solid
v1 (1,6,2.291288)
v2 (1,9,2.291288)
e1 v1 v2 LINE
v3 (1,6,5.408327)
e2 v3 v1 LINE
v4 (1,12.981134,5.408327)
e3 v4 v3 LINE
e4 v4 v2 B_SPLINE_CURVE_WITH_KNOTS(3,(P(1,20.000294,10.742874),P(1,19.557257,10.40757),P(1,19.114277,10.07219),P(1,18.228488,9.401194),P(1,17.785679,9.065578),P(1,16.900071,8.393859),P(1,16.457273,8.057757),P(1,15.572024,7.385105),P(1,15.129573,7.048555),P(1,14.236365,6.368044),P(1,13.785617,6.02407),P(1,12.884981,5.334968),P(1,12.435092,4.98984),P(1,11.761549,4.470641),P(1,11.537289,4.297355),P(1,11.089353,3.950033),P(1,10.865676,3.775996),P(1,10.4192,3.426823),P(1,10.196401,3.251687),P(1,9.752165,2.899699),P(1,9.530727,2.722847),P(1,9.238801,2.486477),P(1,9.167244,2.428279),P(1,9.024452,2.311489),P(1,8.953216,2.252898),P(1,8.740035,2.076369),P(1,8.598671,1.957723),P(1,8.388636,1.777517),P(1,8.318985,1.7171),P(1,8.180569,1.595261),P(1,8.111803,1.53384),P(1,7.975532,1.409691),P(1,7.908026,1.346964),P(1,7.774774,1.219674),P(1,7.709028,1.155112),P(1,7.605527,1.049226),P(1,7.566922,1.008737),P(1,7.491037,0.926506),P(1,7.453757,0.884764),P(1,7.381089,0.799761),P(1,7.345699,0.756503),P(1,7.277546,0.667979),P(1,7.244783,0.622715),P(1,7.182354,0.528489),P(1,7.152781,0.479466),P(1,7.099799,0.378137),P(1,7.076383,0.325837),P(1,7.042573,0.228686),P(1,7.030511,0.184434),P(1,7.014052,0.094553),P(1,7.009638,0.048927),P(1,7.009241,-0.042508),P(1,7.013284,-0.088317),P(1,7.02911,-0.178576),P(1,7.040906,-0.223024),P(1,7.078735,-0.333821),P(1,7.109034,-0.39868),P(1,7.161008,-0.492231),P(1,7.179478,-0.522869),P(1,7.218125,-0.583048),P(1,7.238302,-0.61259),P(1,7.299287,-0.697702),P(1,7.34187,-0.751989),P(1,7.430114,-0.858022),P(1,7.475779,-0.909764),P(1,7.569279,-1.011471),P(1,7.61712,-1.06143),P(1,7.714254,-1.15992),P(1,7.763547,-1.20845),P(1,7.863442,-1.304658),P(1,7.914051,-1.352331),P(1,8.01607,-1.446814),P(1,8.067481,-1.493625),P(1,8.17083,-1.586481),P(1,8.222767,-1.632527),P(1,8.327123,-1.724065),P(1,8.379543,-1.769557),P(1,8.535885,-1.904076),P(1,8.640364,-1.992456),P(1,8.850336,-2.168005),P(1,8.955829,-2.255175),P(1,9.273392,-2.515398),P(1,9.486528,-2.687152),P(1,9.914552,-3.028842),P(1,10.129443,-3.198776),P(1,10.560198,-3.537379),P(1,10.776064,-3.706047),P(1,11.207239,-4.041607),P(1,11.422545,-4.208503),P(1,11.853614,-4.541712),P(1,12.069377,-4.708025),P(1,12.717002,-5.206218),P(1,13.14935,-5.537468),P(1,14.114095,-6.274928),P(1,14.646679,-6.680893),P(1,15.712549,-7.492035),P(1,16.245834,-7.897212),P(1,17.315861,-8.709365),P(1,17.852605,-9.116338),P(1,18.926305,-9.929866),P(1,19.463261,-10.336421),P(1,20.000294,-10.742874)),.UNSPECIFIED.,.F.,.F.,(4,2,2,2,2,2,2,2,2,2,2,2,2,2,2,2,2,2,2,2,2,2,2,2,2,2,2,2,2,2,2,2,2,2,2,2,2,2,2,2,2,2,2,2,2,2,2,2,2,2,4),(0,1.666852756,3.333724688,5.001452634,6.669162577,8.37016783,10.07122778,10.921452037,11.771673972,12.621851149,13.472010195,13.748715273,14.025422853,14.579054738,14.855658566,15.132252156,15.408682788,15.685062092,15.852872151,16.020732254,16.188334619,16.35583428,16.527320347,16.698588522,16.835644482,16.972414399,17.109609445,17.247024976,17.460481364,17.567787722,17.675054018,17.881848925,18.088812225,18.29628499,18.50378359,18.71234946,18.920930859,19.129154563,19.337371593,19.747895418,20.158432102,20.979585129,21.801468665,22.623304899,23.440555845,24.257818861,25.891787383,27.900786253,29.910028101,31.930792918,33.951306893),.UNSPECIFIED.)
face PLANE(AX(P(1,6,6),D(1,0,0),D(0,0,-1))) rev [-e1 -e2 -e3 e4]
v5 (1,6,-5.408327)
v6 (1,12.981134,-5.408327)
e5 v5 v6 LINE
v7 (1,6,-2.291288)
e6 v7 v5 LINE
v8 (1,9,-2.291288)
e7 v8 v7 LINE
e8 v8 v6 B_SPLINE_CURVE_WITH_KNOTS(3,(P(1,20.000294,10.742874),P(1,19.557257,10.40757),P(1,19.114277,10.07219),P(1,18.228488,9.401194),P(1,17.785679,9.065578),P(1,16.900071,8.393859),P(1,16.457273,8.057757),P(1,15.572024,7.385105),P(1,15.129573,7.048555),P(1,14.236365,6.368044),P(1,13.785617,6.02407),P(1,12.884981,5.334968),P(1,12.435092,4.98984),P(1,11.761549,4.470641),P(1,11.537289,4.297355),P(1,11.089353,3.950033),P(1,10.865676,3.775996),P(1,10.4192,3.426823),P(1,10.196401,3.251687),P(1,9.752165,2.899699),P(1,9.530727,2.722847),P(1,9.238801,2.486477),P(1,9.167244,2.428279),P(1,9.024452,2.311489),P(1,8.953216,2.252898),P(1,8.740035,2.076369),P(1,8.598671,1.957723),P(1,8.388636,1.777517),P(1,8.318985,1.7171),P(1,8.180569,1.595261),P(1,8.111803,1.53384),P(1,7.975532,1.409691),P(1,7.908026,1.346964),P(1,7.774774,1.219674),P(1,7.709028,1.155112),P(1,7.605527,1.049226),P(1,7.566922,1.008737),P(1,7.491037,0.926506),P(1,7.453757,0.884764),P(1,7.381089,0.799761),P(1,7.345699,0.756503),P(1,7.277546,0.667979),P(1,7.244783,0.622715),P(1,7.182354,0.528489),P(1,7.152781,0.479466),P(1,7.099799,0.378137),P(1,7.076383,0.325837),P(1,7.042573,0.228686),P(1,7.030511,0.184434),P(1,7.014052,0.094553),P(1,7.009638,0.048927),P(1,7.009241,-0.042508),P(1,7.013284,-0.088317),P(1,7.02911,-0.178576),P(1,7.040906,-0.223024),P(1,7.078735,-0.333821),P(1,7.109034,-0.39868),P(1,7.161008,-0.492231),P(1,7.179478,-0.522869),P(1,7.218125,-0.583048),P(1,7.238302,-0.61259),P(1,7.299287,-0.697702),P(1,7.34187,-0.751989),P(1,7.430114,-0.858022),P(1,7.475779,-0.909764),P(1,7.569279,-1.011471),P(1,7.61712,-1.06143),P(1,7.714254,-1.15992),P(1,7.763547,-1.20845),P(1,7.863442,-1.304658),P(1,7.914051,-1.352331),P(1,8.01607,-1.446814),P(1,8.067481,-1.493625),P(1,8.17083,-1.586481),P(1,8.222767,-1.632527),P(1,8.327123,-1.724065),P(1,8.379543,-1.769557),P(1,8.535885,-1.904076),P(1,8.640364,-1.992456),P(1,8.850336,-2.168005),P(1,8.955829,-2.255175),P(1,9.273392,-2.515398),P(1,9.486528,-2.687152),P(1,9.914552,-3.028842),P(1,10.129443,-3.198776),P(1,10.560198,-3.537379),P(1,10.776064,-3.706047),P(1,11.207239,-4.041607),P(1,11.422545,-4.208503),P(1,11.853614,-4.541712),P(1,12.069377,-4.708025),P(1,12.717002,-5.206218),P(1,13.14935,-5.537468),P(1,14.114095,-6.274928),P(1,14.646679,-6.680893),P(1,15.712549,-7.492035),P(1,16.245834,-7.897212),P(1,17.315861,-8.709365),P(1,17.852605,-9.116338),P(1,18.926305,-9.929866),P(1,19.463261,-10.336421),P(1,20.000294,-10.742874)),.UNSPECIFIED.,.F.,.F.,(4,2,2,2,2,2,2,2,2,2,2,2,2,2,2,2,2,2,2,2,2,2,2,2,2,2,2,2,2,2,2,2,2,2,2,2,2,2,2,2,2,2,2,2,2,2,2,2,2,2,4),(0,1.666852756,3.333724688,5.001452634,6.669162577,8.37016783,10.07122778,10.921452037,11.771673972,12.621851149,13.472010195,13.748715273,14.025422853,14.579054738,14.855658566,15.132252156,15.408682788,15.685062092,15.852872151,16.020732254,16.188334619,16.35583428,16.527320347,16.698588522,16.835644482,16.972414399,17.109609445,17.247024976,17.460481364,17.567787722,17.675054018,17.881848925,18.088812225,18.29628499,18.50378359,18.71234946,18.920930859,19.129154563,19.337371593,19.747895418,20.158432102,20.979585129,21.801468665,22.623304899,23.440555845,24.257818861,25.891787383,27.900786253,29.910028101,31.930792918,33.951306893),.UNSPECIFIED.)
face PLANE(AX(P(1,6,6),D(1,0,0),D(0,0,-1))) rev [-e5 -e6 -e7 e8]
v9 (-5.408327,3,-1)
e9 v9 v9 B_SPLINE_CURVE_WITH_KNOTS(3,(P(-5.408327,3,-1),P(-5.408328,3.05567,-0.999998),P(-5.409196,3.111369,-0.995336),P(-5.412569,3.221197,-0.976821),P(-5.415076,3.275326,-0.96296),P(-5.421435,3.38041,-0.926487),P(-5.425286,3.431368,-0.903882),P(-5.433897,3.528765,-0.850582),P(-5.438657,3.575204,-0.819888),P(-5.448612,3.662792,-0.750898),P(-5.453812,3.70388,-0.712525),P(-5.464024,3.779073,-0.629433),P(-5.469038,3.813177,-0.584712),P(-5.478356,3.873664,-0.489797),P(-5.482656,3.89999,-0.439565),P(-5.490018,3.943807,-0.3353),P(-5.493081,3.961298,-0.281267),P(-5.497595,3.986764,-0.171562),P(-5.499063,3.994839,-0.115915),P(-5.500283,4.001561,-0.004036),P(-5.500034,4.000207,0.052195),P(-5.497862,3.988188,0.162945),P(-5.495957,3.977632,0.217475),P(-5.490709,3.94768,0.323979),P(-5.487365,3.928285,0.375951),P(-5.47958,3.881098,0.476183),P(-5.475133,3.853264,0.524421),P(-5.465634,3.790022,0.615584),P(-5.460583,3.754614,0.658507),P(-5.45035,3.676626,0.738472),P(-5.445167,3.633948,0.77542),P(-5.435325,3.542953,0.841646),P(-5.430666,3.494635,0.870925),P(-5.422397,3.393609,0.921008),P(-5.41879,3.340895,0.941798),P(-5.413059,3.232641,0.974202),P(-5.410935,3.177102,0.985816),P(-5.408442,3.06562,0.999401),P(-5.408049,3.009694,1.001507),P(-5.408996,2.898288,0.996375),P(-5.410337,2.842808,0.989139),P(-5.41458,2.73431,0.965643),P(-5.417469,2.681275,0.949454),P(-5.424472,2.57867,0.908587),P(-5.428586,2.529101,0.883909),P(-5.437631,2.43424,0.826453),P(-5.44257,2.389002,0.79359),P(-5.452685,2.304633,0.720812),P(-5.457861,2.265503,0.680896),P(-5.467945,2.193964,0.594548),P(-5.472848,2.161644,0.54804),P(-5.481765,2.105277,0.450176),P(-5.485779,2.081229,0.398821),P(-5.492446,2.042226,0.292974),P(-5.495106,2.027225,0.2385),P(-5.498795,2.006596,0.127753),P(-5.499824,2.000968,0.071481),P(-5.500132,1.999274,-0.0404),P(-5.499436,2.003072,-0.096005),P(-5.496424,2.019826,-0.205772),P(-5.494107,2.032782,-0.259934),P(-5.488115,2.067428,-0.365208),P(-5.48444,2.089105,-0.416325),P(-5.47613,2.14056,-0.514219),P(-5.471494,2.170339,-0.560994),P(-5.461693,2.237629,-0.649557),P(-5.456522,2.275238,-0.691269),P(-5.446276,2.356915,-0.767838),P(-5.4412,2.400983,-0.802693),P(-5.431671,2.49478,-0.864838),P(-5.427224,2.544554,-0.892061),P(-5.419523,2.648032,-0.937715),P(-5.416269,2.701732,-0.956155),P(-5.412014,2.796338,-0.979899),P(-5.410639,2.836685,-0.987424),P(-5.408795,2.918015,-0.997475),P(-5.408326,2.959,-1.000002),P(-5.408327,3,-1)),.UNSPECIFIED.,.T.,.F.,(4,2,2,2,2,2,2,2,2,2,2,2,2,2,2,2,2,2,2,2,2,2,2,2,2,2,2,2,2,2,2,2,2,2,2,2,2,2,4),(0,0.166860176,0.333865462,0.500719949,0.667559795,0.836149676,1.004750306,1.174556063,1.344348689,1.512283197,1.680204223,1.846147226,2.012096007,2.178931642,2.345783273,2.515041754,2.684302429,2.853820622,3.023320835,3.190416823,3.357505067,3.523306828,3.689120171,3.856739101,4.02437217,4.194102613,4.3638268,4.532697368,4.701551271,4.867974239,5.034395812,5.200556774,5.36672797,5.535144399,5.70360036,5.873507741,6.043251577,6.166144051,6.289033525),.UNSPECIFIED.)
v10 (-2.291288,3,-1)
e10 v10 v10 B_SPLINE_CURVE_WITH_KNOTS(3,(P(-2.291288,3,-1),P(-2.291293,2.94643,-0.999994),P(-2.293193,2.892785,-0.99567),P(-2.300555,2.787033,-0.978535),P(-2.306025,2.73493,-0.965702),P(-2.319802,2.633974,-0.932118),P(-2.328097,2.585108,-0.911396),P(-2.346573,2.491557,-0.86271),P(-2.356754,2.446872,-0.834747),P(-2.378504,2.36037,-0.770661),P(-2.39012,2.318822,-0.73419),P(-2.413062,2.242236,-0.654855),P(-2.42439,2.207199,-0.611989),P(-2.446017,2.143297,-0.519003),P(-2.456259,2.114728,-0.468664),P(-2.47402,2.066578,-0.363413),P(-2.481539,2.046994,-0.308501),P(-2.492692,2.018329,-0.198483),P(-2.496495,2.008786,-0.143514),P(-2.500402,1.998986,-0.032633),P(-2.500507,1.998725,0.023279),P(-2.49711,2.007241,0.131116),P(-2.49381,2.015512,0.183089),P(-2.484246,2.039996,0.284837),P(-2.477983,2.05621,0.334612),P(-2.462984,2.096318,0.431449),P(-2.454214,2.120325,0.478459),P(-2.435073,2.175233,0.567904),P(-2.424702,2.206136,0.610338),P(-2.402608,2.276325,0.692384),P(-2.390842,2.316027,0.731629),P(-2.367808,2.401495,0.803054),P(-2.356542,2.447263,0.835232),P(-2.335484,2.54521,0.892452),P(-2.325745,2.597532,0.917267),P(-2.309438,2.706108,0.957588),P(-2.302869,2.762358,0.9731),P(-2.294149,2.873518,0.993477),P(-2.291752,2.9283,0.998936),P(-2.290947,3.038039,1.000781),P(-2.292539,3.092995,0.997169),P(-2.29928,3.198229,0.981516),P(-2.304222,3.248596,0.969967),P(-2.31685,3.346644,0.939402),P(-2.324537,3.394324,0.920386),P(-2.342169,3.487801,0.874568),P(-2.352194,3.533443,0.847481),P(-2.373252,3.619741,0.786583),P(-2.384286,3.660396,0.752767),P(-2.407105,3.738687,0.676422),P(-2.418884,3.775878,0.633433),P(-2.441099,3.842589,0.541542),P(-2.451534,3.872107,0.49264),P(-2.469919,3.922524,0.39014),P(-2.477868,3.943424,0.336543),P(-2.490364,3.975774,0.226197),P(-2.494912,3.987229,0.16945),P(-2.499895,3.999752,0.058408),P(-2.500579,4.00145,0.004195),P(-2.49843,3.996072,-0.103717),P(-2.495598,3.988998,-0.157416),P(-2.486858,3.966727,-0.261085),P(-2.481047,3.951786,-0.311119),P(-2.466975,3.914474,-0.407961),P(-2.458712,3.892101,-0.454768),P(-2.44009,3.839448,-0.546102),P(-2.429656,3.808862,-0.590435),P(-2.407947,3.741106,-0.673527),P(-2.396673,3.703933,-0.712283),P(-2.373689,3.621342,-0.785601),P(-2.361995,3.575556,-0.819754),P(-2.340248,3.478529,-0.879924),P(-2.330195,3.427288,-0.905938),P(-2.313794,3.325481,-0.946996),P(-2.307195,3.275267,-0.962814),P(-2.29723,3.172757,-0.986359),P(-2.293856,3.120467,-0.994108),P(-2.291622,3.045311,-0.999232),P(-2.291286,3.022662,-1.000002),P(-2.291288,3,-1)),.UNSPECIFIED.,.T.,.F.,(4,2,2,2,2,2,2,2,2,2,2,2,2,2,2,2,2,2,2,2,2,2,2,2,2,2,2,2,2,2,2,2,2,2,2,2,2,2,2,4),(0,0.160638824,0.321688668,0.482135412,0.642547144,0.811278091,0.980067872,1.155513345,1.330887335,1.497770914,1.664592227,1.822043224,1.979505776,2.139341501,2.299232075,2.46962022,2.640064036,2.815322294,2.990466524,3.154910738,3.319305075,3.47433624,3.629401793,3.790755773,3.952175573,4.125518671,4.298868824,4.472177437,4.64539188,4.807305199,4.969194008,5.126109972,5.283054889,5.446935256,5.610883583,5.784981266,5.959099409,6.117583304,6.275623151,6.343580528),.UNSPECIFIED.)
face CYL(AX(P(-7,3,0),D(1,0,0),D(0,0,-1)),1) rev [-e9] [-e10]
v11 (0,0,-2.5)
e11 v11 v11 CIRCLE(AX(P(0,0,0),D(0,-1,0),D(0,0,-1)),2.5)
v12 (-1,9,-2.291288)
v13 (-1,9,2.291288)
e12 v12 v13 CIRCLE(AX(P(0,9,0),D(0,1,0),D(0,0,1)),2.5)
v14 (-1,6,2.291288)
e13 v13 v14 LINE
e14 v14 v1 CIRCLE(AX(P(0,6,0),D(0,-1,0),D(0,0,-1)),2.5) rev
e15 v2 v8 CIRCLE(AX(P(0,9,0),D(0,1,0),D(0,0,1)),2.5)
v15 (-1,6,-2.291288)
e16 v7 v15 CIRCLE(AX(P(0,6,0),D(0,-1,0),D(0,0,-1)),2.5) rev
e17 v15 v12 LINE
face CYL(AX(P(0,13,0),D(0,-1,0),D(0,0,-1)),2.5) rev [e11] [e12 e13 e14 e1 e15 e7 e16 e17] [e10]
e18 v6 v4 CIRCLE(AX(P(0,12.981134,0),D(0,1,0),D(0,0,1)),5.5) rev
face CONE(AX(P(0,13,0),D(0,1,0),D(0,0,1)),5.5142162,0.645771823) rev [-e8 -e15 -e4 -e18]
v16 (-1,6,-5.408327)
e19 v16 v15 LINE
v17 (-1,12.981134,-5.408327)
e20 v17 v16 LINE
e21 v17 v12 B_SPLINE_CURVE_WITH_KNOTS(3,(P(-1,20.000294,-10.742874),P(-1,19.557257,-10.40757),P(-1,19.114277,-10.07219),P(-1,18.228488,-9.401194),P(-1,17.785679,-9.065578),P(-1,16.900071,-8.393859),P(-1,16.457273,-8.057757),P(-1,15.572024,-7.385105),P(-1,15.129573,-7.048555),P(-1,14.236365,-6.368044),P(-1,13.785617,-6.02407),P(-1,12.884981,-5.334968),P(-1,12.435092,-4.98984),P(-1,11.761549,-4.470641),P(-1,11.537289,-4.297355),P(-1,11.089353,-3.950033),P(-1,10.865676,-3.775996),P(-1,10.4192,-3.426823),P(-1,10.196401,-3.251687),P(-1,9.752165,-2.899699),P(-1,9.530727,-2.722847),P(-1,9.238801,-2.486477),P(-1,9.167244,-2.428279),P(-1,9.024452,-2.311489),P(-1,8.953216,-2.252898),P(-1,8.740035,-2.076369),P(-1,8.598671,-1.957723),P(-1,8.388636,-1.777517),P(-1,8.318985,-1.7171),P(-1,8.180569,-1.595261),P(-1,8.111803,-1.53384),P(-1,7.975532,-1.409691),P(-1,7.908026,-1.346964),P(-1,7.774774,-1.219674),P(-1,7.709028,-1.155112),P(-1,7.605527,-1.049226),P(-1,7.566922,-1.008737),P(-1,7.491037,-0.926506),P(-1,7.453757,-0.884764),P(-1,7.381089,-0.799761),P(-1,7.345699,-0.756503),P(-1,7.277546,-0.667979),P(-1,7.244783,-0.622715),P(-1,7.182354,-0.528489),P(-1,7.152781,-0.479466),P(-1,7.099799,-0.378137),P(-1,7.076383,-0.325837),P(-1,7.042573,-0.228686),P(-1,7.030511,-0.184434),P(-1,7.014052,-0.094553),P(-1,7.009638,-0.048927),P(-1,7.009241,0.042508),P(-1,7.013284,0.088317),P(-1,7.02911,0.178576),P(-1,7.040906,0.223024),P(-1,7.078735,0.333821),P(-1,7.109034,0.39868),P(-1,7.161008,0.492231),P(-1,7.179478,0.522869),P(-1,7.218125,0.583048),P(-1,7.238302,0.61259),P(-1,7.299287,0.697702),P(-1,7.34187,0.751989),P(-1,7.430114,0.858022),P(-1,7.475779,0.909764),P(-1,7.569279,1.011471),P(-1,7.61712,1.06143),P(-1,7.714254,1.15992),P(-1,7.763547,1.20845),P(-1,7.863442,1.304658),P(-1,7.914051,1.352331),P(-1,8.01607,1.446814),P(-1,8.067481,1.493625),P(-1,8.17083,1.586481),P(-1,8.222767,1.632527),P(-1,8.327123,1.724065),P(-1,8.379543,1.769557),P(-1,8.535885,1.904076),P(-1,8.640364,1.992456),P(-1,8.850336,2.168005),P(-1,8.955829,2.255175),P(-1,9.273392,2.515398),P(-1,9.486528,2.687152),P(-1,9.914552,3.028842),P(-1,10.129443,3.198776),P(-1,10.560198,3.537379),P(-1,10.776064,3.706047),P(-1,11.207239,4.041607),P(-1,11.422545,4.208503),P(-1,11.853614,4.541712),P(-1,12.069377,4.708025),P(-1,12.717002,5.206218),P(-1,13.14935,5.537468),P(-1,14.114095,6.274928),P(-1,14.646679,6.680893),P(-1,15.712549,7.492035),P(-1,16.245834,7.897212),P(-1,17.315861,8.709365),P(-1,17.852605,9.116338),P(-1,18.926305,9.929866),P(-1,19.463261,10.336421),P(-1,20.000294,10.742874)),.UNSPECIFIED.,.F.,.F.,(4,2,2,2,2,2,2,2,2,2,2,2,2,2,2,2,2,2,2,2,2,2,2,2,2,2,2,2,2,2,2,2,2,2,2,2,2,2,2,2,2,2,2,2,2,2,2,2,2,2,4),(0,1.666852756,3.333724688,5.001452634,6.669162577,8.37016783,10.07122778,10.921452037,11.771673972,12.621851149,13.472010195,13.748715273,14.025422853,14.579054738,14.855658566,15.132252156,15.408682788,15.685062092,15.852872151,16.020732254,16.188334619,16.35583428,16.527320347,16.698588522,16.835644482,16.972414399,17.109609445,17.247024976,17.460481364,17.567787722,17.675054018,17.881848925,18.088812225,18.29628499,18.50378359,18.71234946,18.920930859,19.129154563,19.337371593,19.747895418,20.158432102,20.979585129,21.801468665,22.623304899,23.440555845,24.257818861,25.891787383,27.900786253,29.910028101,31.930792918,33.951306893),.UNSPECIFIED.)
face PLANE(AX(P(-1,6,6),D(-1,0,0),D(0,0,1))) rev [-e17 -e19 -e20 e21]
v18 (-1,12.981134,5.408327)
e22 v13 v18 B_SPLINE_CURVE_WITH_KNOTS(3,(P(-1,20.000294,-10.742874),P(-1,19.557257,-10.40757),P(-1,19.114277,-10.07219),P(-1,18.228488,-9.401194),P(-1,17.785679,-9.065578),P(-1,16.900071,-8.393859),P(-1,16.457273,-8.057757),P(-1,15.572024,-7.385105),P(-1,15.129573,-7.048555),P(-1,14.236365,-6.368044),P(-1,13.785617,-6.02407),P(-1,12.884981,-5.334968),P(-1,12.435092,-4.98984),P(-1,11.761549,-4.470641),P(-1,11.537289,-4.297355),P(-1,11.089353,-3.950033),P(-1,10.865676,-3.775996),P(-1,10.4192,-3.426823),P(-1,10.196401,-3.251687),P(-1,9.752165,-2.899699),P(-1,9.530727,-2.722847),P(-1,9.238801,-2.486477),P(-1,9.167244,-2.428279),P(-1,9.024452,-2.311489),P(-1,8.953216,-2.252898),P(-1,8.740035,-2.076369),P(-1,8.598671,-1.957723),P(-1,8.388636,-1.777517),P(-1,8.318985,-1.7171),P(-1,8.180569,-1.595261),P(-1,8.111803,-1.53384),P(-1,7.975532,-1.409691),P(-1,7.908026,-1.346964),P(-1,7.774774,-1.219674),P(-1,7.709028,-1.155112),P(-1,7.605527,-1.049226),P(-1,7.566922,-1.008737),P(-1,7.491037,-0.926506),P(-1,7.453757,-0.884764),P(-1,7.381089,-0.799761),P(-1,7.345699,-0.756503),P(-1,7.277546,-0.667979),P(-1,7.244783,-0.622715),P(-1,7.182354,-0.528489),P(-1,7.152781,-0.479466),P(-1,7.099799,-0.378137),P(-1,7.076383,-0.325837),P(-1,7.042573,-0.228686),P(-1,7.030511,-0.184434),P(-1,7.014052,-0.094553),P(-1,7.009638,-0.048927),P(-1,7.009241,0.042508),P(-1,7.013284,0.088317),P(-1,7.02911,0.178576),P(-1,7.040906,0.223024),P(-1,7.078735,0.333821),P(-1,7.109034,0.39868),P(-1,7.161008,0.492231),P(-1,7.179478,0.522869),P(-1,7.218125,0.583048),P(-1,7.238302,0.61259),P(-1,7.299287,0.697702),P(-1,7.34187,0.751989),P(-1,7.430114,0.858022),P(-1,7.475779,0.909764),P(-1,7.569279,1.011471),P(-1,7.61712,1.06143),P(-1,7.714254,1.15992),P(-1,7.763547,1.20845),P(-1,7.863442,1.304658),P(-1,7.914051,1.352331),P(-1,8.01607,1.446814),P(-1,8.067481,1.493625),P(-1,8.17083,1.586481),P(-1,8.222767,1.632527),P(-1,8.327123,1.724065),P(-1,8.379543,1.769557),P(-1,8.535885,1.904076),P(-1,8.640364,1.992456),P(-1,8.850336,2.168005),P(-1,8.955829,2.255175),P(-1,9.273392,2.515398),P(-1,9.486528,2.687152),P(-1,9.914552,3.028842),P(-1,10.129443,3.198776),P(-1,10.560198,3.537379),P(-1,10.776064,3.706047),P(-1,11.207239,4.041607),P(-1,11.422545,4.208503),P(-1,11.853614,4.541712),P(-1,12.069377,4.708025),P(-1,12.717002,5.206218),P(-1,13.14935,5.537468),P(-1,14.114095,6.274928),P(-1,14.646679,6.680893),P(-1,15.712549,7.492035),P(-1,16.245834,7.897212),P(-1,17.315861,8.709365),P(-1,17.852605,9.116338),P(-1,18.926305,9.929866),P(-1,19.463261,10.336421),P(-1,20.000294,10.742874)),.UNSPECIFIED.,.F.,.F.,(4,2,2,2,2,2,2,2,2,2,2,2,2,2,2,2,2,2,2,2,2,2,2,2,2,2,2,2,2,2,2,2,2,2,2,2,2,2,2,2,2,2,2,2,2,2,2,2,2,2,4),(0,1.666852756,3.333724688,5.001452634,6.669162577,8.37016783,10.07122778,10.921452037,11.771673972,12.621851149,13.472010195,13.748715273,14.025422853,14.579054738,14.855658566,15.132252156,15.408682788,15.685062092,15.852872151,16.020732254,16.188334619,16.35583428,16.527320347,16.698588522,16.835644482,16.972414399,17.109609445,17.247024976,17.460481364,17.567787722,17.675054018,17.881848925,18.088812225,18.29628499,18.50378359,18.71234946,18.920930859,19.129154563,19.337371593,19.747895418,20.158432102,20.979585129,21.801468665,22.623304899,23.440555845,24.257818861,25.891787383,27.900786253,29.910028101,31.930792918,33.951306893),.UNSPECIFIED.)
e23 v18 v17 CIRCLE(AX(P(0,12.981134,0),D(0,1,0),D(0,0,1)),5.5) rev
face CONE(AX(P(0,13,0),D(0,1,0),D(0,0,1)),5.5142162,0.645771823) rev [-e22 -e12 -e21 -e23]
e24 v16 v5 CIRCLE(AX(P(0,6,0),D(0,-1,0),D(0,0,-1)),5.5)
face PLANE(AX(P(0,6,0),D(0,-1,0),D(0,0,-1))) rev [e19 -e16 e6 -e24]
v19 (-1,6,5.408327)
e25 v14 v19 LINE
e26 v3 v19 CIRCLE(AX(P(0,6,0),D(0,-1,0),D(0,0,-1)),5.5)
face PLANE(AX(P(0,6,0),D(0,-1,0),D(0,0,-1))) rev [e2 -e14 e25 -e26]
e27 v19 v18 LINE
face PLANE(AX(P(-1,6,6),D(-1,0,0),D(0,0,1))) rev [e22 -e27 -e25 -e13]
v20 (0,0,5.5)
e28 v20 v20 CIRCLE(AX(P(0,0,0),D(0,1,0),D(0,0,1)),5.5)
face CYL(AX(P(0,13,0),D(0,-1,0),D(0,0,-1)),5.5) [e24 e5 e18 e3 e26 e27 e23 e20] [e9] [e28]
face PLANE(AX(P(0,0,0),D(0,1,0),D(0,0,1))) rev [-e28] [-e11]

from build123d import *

# Parameters (mm, degrees)
SKETCH1_R           = 5.5
BOSS_EXTRUDE1_DEPTH = 13
SKETCH2_R           = 2.5
CUT_EXTRUDE1_DEPTH  = 16.149257408
CHAMFER1_SIZE       = 3.0142162
CHAMFER1_SIZE_2     = 4
SKETCH4_W           = 2
SKETCH4_H           = 12
CUT_EXTRUDE2_DEPTH  = 7
SKETCH5_R           = 1
CUT_EXTRUDE3_DEPTH  = 7


with BuildPart() as part:
    # Sketch1 → Boss-Extrude1 (new body)
    with BuildSketch(Plane(origin=(0, 0, 0), x_dir=(1, 0, 0), z_dir=(0, 1, 0))):
        with Locations(Location((0, 0, 0), (0, 0, 90))):
            Circle(SKETCH1_R)
    extrude(amount=BOSS_EXTRUDE1_DEPTH)

    # Sketch2 → Cut-Extrude1 (cut, through all)
    with BuildSketch(Plane.XZ):
        with Locations(Location((0, 0, 0), (0, 0, 270))):
            Circle(SKETCH2_R)
    extrude(amount=-CUT_EXTRUDE1_DEPTH, mode=Mode.SUBTRACT)

    # Chamfer1
    # the kernel refuses this chamfer: 4, 3.0142162 mm, written as the material it takes off along each edge
    with BuildSketch(Plane(origin=(0, 13, 0), x_dir=(0, 0, -1), z_dir=(-1, 0, 0))) as chamfer1_piece_1:
        Polygon((2.5 + CHAMFER1_SIZE, 0), (2.5, CHAMFER1_SIZE_2), (2.5, 0), align=None)
    revolve(axis=Axis((0, 13, 0), (0, -1, 0)), mode=Mode.SUBTRACT)

    # Sketch4 → Cut-Extrude2 (cut)
    with BuildSketch(Plane(origin=(0, 13, 0), x_dir=(1, 0, 0), z_dir=(0, 1, 0))):
        Rectangle(SKETCH4_W, SKETCH4_H)
    extrude(amount=-CUT_EXTRUDE2_DEPTH, mode=Mode.SUBTRACT)

    # Sketch5 → Cut-Extrude3 (cut)
    with BuildSketch(Plane(origin=(0, 0, 0), x_dir=(0, 0, -1), z_dir=(1, 0, 0))):
        with Locations((0, 3)):
            Circle(SKETCH5_R)
    extrude(amount=-CUT_EXTRUDE3_DEPTH, mode=Mode.SUBTRACT)


solid = part.part
